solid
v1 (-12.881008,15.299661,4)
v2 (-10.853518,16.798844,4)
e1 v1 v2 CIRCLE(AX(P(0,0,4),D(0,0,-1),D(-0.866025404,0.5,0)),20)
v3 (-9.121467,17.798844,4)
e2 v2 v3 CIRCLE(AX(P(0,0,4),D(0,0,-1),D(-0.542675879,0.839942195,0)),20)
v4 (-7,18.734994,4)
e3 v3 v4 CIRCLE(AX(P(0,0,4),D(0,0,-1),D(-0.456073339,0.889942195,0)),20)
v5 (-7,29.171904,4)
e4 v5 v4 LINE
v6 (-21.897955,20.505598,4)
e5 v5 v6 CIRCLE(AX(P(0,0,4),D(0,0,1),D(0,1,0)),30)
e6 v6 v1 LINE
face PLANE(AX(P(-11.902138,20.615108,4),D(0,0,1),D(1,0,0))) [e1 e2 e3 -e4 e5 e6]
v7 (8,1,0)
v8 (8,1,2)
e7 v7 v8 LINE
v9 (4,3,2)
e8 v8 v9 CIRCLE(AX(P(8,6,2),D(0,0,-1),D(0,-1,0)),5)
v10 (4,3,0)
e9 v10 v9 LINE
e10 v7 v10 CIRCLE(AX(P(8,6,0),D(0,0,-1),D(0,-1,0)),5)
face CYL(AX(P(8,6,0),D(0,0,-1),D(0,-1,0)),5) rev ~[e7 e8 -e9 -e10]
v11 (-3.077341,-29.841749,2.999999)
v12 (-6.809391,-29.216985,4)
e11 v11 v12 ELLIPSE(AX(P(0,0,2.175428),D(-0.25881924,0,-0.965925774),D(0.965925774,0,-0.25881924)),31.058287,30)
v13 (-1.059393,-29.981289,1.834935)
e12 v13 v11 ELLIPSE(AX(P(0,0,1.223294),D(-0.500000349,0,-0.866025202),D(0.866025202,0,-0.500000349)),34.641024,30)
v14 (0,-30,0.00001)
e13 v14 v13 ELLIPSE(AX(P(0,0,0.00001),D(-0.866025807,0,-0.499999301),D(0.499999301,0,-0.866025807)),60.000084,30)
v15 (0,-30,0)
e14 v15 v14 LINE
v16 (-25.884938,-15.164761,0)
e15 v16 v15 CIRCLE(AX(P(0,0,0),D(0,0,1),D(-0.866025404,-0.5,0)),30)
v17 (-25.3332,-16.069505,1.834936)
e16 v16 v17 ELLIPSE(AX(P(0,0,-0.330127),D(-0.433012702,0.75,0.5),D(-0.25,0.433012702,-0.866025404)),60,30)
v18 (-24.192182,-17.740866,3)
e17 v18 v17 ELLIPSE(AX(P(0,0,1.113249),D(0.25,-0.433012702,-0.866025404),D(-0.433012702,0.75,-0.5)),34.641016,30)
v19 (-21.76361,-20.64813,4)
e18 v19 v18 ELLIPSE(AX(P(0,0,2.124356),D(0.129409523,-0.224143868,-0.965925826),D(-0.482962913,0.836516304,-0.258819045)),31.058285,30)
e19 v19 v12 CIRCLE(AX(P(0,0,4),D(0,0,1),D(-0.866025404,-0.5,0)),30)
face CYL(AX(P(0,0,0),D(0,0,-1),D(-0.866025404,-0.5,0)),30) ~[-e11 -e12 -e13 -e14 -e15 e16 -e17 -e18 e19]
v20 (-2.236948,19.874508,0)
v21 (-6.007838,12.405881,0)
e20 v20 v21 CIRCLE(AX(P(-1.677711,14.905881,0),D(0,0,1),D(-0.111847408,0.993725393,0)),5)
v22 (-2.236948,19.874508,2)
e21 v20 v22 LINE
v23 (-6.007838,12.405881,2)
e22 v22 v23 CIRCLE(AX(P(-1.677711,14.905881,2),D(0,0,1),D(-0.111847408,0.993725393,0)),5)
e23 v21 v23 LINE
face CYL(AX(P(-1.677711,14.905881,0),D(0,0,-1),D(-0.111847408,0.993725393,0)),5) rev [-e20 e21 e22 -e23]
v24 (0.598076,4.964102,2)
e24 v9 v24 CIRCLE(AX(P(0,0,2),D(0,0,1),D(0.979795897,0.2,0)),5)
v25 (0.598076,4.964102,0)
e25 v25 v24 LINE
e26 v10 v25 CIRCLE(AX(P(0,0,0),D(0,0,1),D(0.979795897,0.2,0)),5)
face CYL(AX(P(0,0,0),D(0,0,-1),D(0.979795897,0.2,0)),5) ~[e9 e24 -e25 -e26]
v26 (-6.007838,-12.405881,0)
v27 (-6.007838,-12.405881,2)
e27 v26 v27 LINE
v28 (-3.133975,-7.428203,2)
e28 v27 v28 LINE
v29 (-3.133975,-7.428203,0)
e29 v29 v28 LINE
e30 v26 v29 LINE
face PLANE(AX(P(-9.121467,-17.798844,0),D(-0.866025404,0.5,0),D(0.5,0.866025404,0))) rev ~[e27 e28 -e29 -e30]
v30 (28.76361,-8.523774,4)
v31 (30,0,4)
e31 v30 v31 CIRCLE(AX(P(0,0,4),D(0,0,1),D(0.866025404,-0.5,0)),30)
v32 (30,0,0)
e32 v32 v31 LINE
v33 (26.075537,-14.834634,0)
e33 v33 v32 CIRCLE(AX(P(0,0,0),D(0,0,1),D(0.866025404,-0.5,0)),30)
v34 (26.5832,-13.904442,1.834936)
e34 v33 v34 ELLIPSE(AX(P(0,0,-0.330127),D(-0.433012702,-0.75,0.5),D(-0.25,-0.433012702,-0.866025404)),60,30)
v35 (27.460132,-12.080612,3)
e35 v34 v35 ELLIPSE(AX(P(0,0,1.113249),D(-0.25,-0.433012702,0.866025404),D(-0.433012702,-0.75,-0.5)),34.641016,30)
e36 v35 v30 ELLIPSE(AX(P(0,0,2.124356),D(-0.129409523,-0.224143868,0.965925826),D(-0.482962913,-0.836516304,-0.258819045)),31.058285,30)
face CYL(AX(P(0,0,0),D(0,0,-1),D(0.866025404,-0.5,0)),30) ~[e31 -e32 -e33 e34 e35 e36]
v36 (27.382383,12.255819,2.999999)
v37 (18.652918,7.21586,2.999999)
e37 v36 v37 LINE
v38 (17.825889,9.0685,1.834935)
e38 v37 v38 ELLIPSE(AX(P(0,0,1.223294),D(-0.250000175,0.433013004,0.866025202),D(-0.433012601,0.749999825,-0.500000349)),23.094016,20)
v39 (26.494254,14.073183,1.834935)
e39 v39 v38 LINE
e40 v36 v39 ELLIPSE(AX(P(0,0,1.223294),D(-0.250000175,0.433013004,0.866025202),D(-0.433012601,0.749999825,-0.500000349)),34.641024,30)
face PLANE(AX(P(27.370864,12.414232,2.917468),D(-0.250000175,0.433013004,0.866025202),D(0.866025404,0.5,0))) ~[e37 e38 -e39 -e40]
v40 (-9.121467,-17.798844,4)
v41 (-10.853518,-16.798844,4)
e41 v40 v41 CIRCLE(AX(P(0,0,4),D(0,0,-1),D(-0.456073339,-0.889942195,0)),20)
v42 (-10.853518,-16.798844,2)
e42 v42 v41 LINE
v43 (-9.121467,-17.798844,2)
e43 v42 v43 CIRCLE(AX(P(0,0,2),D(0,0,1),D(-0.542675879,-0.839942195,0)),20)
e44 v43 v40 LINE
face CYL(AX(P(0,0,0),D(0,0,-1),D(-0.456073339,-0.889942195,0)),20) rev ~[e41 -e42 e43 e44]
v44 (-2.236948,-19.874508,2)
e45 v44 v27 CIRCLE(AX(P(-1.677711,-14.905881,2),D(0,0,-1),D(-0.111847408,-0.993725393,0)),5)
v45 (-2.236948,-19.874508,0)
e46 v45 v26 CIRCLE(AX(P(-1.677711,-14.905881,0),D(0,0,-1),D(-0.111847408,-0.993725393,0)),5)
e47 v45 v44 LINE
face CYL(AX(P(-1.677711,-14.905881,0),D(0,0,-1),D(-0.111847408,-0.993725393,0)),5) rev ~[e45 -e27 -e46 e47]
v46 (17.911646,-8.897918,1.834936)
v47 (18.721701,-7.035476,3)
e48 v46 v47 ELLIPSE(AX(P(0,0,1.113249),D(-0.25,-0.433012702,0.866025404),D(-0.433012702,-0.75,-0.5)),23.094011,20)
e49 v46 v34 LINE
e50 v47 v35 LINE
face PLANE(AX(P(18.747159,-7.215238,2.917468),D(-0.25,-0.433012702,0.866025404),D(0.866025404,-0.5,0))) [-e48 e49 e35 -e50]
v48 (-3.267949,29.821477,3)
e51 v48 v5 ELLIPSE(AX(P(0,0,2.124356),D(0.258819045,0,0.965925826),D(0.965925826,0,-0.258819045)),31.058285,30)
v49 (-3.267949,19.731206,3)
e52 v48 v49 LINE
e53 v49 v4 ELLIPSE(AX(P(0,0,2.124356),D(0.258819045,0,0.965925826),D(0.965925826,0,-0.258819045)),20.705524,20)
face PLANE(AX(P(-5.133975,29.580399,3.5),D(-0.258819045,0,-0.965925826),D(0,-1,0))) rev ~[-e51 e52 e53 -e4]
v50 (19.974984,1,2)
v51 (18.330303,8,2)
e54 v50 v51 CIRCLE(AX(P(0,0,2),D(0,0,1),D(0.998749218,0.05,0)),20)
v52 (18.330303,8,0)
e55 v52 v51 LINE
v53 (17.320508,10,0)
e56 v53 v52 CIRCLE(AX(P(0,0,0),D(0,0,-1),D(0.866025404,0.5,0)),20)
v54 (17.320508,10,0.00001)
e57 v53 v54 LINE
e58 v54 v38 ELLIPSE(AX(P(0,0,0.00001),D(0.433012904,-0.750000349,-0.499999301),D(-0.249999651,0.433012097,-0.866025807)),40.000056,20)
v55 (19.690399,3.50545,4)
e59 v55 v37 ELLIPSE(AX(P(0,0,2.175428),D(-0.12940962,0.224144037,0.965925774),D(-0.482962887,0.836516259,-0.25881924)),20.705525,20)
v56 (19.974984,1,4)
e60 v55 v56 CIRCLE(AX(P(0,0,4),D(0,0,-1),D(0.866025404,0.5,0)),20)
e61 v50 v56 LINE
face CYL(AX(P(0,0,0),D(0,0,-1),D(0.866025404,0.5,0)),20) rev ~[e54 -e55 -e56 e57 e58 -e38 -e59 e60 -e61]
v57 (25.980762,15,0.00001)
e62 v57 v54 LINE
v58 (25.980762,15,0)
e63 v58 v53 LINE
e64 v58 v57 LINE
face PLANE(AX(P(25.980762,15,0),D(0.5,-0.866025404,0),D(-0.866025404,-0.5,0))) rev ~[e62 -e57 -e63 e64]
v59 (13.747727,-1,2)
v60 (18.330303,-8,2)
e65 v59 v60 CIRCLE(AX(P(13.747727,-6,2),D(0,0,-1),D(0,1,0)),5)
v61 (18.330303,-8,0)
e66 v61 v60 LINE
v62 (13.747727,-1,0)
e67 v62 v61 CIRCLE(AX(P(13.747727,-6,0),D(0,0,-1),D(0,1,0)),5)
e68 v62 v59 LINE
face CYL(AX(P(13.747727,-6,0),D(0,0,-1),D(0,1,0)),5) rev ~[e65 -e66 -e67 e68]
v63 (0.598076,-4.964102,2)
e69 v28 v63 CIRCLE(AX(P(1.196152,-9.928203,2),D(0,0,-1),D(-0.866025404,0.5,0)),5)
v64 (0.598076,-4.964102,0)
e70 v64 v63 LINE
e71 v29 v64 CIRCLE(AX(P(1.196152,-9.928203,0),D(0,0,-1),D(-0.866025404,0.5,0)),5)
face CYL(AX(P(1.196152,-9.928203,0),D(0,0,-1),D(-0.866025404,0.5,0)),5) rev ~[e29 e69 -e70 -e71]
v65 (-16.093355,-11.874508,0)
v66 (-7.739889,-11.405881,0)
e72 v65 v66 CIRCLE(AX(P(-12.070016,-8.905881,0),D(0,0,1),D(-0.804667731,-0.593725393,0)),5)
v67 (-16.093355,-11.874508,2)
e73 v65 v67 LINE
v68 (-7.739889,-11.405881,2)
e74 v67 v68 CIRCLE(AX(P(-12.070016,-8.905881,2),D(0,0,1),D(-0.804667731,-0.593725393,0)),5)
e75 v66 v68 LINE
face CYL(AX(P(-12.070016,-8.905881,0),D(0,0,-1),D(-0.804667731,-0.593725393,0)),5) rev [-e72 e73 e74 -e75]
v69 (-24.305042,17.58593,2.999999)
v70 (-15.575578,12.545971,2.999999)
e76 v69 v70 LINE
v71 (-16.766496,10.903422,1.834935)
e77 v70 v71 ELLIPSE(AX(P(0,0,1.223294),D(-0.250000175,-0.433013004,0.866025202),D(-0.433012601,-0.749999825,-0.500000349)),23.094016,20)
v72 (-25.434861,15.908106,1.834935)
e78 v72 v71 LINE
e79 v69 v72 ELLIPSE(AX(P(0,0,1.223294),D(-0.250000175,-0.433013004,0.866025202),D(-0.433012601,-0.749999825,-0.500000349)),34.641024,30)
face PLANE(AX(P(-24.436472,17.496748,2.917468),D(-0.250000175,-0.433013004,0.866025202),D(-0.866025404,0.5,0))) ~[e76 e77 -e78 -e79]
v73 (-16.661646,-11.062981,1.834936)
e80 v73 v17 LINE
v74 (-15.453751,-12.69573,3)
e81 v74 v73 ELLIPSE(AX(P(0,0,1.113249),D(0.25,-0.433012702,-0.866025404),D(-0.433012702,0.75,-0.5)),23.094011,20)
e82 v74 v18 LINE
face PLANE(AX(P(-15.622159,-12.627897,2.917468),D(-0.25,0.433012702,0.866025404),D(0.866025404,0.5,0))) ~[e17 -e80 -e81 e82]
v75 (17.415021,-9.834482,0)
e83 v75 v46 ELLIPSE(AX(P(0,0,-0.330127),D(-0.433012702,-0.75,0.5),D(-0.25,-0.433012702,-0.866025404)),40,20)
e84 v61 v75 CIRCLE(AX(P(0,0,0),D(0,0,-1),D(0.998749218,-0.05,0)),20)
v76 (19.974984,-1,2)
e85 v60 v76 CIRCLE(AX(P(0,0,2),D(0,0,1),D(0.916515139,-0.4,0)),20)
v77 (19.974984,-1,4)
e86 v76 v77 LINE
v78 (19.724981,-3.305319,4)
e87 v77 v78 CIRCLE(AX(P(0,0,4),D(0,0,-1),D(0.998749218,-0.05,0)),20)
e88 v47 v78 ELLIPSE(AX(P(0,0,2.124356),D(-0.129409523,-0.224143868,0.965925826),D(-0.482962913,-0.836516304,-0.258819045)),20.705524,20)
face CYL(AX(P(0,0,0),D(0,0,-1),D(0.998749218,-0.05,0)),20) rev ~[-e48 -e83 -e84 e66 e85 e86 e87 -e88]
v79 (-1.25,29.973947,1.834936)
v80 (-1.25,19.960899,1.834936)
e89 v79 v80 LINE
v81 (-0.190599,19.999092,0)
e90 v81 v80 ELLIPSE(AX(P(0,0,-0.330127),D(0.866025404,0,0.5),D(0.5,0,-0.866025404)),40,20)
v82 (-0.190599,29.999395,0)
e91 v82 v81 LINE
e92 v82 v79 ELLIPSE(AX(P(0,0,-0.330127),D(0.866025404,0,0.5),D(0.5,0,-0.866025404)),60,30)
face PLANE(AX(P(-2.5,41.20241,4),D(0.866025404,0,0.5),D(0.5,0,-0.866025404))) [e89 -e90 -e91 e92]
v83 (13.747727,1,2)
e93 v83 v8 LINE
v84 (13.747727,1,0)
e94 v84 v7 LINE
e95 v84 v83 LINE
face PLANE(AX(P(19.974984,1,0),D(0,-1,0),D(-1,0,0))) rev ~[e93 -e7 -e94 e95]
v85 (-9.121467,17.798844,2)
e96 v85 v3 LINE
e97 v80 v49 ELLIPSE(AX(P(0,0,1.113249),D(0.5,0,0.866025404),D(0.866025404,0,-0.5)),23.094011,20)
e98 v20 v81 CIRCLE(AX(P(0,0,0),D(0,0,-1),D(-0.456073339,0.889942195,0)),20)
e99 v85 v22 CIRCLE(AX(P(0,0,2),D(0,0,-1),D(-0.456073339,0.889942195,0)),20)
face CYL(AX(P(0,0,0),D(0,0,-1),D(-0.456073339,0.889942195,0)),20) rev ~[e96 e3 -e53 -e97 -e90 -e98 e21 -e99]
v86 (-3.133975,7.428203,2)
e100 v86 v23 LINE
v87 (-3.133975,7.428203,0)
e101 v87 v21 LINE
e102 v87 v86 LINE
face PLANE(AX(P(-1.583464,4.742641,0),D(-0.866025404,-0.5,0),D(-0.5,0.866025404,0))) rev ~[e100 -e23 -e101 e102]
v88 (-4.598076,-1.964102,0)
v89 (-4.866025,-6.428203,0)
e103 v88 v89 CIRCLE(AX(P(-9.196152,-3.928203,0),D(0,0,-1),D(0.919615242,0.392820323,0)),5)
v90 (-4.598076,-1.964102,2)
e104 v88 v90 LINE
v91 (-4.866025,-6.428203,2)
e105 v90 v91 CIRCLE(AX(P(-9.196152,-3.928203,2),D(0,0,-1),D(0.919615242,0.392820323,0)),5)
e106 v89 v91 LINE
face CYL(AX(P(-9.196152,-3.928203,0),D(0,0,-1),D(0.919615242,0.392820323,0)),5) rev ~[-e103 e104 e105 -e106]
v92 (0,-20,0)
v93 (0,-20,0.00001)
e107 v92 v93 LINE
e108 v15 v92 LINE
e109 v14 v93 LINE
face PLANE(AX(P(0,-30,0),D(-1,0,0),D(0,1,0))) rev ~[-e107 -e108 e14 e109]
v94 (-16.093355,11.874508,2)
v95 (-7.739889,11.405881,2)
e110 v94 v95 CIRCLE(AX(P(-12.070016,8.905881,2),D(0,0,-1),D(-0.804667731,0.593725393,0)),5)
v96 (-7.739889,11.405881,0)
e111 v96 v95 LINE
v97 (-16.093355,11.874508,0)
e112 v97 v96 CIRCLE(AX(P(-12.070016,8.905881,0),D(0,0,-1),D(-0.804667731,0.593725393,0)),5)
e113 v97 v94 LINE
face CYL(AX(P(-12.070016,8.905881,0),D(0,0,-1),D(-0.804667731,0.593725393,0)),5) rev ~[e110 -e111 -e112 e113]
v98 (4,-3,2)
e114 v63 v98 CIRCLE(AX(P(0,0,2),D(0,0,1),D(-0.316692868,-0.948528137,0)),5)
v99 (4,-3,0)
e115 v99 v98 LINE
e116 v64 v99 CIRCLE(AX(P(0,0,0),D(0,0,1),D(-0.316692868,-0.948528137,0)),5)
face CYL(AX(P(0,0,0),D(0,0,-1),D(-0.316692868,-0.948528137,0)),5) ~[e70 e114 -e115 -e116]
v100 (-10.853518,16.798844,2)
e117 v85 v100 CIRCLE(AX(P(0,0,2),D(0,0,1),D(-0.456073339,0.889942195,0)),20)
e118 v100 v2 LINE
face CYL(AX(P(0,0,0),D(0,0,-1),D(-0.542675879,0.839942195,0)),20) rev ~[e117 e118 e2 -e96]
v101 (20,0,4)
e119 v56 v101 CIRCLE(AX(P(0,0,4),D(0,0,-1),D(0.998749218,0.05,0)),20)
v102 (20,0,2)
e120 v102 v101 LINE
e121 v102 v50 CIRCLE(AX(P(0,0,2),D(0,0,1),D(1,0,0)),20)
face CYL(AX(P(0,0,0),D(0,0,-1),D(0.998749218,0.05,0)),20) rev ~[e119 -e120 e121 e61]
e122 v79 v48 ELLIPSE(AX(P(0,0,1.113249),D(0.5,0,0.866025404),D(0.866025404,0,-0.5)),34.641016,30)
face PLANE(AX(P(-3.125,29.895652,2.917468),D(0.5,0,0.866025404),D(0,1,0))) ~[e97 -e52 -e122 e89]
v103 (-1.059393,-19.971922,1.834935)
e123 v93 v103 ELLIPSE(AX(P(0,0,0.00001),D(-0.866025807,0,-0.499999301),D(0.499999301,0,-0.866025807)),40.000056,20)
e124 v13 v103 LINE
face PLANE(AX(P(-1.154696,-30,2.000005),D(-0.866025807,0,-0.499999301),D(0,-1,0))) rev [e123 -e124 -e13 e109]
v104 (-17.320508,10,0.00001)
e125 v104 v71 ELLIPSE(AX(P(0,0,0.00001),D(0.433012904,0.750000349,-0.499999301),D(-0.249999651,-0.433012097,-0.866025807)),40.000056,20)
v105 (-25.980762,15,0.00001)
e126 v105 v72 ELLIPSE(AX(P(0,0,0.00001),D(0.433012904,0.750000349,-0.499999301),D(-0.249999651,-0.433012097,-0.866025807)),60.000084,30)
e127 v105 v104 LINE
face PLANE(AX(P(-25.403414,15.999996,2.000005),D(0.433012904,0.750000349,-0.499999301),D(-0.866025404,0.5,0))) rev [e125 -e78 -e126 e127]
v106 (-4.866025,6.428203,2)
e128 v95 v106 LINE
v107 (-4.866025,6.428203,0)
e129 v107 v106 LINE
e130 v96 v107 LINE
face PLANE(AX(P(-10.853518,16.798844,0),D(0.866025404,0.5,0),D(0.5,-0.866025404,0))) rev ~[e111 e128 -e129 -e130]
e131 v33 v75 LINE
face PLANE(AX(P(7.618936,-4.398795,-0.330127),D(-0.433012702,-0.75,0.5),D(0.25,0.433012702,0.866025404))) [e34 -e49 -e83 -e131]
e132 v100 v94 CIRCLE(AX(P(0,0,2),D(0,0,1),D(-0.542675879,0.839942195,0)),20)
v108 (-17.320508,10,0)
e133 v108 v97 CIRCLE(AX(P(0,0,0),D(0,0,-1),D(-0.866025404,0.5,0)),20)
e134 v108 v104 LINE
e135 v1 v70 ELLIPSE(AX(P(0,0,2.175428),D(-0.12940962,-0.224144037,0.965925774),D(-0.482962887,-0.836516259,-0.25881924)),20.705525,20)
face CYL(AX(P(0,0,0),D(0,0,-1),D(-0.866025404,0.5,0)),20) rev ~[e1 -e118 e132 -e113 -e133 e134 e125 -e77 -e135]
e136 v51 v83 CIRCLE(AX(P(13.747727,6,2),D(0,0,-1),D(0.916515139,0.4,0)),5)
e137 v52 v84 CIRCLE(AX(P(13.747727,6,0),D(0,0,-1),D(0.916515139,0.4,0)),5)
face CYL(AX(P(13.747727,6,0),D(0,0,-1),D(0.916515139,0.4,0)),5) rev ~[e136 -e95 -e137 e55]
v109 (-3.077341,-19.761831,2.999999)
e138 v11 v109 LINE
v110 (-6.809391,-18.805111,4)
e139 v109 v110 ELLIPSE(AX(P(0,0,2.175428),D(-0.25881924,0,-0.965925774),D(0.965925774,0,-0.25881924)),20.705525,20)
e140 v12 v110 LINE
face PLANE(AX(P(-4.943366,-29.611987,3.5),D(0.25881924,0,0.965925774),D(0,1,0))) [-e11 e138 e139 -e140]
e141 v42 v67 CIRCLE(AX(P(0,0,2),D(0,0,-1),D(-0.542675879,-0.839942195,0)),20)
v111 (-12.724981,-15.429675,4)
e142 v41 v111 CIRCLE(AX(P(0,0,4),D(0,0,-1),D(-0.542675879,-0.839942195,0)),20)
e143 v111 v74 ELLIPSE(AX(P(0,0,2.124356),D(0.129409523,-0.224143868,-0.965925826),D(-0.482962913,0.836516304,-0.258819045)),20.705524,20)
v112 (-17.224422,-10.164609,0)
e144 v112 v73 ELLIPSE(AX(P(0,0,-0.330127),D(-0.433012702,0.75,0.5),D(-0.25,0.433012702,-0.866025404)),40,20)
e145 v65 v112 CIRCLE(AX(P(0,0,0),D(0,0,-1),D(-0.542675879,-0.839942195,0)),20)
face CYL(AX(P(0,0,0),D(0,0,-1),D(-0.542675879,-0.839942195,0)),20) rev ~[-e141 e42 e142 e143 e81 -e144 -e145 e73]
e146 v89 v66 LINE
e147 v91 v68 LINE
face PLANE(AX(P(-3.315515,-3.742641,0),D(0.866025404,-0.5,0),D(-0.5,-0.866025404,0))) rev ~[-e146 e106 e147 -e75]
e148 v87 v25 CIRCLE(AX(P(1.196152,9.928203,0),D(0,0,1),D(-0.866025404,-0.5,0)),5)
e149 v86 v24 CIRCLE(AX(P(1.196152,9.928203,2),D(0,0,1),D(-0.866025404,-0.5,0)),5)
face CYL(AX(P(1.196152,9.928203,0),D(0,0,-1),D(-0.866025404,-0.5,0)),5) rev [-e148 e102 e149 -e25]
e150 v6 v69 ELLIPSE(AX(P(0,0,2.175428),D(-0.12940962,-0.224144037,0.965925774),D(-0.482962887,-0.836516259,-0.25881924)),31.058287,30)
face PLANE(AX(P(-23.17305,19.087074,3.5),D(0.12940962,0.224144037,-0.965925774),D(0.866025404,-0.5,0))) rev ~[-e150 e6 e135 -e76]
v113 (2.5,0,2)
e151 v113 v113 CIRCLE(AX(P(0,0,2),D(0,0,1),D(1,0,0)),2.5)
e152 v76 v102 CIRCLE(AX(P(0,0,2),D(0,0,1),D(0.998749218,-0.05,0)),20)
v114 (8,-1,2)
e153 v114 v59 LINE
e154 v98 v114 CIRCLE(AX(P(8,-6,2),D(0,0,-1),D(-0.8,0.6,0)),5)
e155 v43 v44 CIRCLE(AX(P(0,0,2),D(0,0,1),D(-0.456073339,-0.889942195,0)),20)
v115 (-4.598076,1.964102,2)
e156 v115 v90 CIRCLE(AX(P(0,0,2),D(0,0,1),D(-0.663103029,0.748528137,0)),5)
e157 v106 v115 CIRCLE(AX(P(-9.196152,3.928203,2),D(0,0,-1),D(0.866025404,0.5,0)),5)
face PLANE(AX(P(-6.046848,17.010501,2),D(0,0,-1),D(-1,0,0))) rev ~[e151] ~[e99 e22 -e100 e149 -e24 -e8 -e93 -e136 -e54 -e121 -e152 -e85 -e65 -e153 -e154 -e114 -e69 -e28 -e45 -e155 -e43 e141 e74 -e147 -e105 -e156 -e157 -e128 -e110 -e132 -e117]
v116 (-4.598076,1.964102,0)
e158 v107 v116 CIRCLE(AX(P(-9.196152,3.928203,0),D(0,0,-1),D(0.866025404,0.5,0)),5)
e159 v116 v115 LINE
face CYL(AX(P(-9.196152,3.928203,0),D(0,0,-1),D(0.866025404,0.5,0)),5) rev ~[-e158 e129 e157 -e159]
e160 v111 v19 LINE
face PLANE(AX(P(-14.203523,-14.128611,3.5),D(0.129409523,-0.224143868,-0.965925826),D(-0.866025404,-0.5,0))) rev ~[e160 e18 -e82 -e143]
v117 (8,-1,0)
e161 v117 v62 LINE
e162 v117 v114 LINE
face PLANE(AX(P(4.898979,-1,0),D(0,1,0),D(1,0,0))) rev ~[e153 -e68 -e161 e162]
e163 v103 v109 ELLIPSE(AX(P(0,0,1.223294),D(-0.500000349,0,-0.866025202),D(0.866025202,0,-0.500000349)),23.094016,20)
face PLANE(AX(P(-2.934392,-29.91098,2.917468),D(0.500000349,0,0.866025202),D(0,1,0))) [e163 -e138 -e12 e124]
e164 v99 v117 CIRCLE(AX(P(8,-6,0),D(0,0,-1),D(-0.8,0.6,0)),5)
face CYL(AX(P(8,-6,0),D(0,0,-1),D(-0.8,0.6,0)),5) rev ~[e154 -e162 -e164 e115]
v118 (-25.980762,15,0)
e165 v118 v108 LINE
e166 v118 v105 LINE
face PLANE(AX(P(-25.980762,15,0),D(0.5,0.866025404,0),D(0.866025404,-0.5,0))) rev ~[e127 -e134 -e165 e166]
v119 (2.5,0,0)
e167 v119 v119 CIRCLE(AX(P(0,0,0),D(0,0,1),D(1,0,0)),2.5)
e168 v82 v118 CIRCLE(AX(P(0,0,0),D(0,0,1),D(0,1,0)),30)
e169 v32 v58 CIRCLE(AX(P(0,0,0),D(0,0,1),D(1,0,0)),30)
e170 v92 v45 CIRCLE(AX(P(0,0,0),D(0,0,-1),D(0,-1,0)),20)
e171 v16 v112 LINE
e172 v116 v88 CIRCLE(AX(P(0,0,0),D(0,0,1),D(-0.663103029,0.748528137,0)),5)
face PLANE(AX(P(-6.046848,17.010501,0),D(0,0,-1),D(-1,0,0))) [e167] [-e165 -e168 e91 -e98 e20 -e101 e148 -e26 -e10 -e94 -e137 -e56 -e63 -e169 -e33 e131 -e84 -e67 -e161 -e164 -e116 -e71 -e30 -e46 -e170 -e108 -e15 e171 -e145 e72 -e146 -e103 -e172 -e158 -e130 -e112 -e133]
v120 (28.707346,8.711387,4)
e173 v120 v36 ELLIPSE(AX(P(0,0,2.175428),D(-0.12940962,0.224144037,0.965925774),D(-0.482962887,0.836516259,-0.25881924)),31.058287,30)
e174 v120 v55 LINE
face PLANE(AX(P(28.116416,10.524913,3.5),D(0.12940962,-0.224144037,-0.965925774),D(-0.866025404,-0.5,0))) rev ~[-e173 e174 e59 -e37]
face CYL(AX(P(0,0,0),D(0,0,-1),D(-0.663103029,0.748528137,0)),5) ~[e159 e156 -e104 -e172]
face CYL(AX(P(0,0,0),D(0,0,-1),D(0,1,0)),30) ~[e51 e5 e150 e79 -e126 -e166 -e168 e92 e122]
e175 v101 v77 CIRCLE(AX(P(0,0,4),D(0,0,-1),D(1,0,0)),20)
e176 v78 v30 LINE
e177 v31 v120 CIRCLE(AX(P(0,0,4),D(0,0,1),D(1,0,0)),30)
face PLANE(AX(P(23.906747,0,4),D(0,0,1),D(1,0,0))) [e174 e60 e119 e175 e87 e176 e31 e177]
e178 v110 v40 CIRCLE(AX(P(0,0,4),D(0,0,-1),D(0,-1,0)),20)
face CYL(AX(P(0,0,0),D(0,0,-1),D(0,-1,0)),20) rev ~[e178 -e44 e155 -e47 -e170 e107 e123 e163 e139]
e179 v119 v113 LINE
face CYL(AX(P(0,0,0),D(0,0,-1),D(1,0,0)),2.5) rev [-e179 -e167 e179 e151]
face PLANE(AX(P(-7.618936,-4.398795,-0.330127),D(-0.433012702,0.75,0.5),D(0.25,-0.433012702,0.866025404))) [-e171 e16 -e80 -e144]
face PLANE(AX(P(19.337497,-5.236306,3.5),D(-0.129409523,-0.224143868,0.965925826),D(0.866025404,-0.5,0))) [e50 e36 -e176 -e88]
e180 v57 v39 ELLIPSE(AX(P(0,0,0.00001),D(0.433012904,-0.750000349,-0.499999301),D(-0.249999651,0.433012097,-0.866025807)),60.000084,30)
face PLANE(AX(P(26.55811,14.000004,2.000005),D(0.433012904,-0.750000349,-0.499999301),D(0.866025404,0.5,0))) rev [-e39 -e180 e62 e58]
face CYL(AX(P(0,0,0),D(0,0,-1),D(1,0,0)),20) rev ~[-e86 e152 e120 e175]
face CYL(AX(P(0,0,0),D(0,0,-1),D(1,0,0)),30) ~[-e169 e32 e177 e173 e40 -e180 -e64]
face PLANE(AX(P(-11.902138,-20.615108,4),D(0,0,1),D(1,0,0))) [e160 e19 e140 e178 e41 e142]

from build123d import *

# Parameters (mm, degrees)
F0_R        = 2.5
F1_DEPTH    = 2
F2_DEPTH    = 4
F3_T1_DEPTH = 2
F4_T1_DEPTH = 32.4048198529
F4_T3_DEPTH = 32.4048198529
F4_T5_DEPTH = 32.4048198529
F5_SIZE2    = 2.309391
F5_SIZE     = 3.99999
F5_2_SIZE2  = 2.309391
F5_2_SIZE   = 3.99999
F5_3_SIZE2  = 2.309391
F5_3_SIZE   = 3.99999
F6_SIZE     = 2.5
F7_SIZE     = 2


# Not quite as in the source:
# - a fillet or chamfer that OpenCascade refuses, or shapes differently, is made with other operations: its cross-section is extruded or revolved along the edge and cut away or added
# - a fillet or chamfer is up to 0.001 mm smaller than in the source, because OpenCascade refuses the exact size


with BuildPart() as f1:
    # F0 (on Top) → F1 (new body)
    with BuildSketch(Plane.XY):
        with BuildLine():
            ThreePointArc((-10.8535175815, -16.798843892), (-10, -17.3205080757), (-9.1214667739, -17.798843892))
            Line((-9.1214667739, -17.798843892), (-1.583464339, -4.7426406871))
            ThreePointArc((-1.583464339, -4.7426406871), (-2.5, -4.3301270189), (-3.3155151466, -3.7426406871))
            Line((-3.3155151466, -3.7426406871), (-10.8535175815, -16.798843892))
        make_face()
        with BuildLine():
            Line((-1.583464339, 4.7426406871), (-9.1214667739, 17.798843892))
            ThreePointArc((-9.1214667739, 17.798843892), (-10, 17.3205080757), (-10.8535175815, 16.798843892))
            Line((-10.8535175815, 16.798843892), (-3.3155151466, 3.7426406871))
            ThreePointArc((-3.3155151466, 3.7426406871), (-2.5, 4.3301270189), (-1.583464339, 4.7426406871))
        make_face()
        with BuildLine():
            ThreePointArc((20, 0), (19.9937451108, 0.5001564212), (19.9749843554, 1))
            Line((19.9749843554, 1), (4.8989794856, 1))
            ThreePointArc((4.8989794856, 1), (4.974680765, 0.50254481), (5, 0))
            ThreePointArc((5, 0), (4.974680765, -0.50254481), (4.8989794856, -1))
            Line((4.8989794856, -1), (19.9749843554, -1))
            ThreePointArc((19.9749843554, -1), (19.9937451108, -0.5001564212), (20, 0))
        make_face()
        with BuildLine():
            ThreePointArc((5, 0), (4.974680765, 0.50254481), (4.8989794856, 1))
            ThreePointArc((4.8989794856, 1), (2.5, 4.3301270189), (-1.583464339, 4.7426406871))
            ThreePointArc((-1.583464339, 4.7426406871), (-2.5, 4.3301270189), (-3.3155151466, 3.7426406871))
            ThreePointArc((-3.3155151466, 3.7426406871), (-5, 0), (-3.3155151466, -3.7426406871))
            ThreePointArc((-3.3155151466, -3.7426406871), (-2.5, -4.3301270189), (-1.583464339, -4.7426406871))
            ThreePointArc((-1.583464339, -4.7426406871), (2.5, -4.3301270189), (4.8989794856, -1))
            ThreePointArc((4.8989794856, -1), (4.974680765, -0.50254481), (5, 0))
        make_face()
        Circle(F0_R, mode=Mode.SUBTRACT)
    extrude(amount=F1_DEPTH)

    # F0 (on Top) → F2 (join)
    with BuildSketch(Plane.XY):
        with BuildLine():
            Line((0, 20), (0, 30))
            ThreePointArc((0, 30), (-15, 25.9807621135), (-25.9807621135, 15))
            Line((-25.9807621135, 15), (-17.3205080757, 10))
            ThreePointArc((-17.3205080757, 10), (-14.4913767462, 13.7840487521), (-10.8535175815, 16.798843892))
            ThreePointArc((-10.8535175815, 16.798843892), (-10, 17.3205080757), (-9.1214667739, 17.798843892))
            ThreePointArc((-9.1214667739, 17.798843892), (-4.6916480132, 19.4419247741), (0, 20))
        make_face()
        with BuildLine():
            ThreePointArc((25.9807621135, -15), (28.9777747887, -7.7645713531), (30, 0))
            ThreePointArc((30, 0), (28.9777747887, 7.7645713531), (25.9807621135, 15))
            Line((25.9807621135, 15), (17.3205080757, 10))
            ThreePointArc((17.3205080757, 10), (19.1830247594, 5.657876022), (19.9749843554, 1))
            ThreePointArc((19.9749843554, 1), (19.9937451108, 0.5001564212), (20, 0))
            ThreePointArc((20, 0), (19.9937451108, -0.5001564212), (19.9749843554, -1))
            ThreePointArc((19.9749843554, -1), (19.1830247594, -5.657876022), (17.3205080757, -10))
            Line((17.3205080757, -10), (25.9807621135, -15))
        make_face()
        with BuildLine():
            ThreePointArc((-25.9807621135, -15), (-15, -25.9807621135), (0, -30))
            Line((0, -30), (0, -20))
            ThreePointArc((0, -20), (-4.6916480132, -19.4419247741), (-9.1214667739, -17.798843892))
            ThreePointArc((-9.1214667739, -17.798843892), (-10, -17.3205080757), (-10.8535175815, -16.798843892))
            ThreePointArc((-10.8535175815, -16.798843892), (-14.4913767462, -13.7840487521), (-17.3205080757, -10))
            Line((-17.3205080757, -10), (-25.9807621135, -15))
        make_face()
    extrude(amount=F2_DEPTH)

    # F3: fillet of radius 5 on 12 edges, made by hand

    # F3_s2 → F3_t1 (join)
    with BuildSketch(Plane.XY):
        with BuildLine():
            ThreePointArc((-2.2369481596, 19.8745078664), (-6.1410694312, 17.1594186926), (-6.0078381387, 12.4058808998))
            Line((-6.0078381387, 12.4058808998), (-9.1214667739, 17.798843892))
            ThreePointArc((-9.1214667739, 17.798843892), (-5.7732566792, 19.148616329), (-2.2369481596, 19.8745078664))
        make_face()
        with BuildLine():
            ThreePointArc((-16.0933546202, 11.8745078664), (-11.7899577863, 13.8980314801), (-7.7398889462, 11.4058808998))
            Line((-7.7398889462, 11.4058808998), (-10.8535175815, 16.798843892))
            ThreePointArc((-10.8535175815, 16.798843892), (-13.6965598486, 14.5740951113), (-16.0933546202, 11.8745078664))
        make_face()
        with BuildLine():
            ThreePointArc((18.3303027798, 8), (17.9310272175, 3.2613872125), (13.7477270849, 1))
            Line((13.7477270849, 1), (19.9749843554, 1))
            ThreePointArc((19.9749843554, 1), (19.4698165279, 4.5745212177), (18.3303027798, 8))
        make_face()
        with BuildLine():
            ThreePointArc((13.7477270849, -1), (17.9310272175, -3.2613872125), (18.3303027798, -8))
            ThreePointArc((18.3303027798, -8), (19.4698165279, -4.5745212177), (19.9749843554, -1))
            Line((19.9749843554, -1), (13.7477270849, -1))
        make_face()
        with BuildLine():
            ThreePointArc((-16.0933546202, -11.8745078664), (-11.7899577863, -13.8980314801), (-7.7398889462, -11.4058808998))
            Line((-7.7398889462, -11.4058808998), (-10.8535175815, -16.798843892))
            ThreePointArc((-10.8535175815, -16.798843892), (-13.6965598486, -14.5740951113), (-16.0933546202, -11.8745078664))
        make_face()
        with BuildLine():
            ThreePointArc((-2.2369481596, -19.8745078664), (-6.1410694312, -17.1594186926), (-6.0078381387, -12.4058808998))
            Line((-6.0078381387, -12.4058808998), (-9.1214667739, -17.798843892))
            ThreePointArc((-9.1214667739, -17.798843892), (-5.7732566792, -19.148616329), (-2.2369481596, -19.8745078664))
        make_face()
        with BuildLine():
            ThreePointArc((-3.1339745962, 7.4282032303), (-1.5587969348, 5.7556435797), (0.5980762114, 4.9641016151))
            ThreePointArc((0.5980762114, 4.9641016151), (-0.5049838375, 4.9744337692), (-1.583464339, 4.7426406871))
            Line((-1.583464339, 4.7426406871), (-3.1339745962, 7.4282032303))
        make_face()
        with BuildLine():
            ThreePointArc((8, 1), (5.7639320225, 1.527864045), (4, 3))
            ThreePointArc((4, 3), (4.5604779323, 2.0498880528), (4.8989794856, 1))
            Line((4.8989794856, 1), (8, 1))
        make_face()
        with BuildLine():
            ThreePointArc((-4.8660254038, 6.4282032303), (-4.2051350877, 4.2277795347), (-4.5980762114, 1.9641016151))
            ThreePointArc((-4.5980762114, 1.9641016151), (-4.0554940948, 2.9245457164), (-3.3155151466, 3.7426406871))
            Line((-3.3155151466, 3.7426406871), (-4.8660254038, 6.4282032303))
        make_face()
        with BuildLine():
            ThreePointArc((-4.5980762114, -1.9641016151), (-4.2051350877, -4.2277795347), (-4.8660254038, -6.4282032303))
            Line((-4.8660254038, -6.4282032303), (-3.3155151466, -3.7426406871))
            ThreePointArc((-3.3155151466, -3.7426406871), (-4.0554940948, -2.9245457164), (-4.5980762114, -1.9641016151))
        make_face()
        with BuildLine():
            ThreePointArc((-3.1339745962, -7.4282032303), (-1.5587969348, -5.7556435797), (0.5980762114, -4.9641016151))
            ThreePointArc((0.5980762114, -4.9641016151), (-0.5049838375, -4.9744337692), (-1.583464339, -4.7426406871))
            Line((-1.583464339, -4.7426406871), (-3.1339745962, -7.4282032303))
        make_face()
        with BuildLine():
            ThreePointArc((4, -3), (5.7639320225, -1.527864045), (8, -1))
            Line((8, -1), (4.8989794856, -1))
            ThreePointArc((4.8989794856, -1), (4.5604779323, -2.0498880528), (4, -3))
        make_face()
    extrude(amount=F3_T1_DEPTH)

    # F4: chamfer of 2.5 x 4.3301270189 on 3 edges, made by hand

    # F4_s2 → F4_t1 (cut)
    with BuildSketch(Plane(origin=(-7.6189364958, -4.3987950368, 0), x_dir=(0, 0, 1), z_dir=(-0.8660254038, -0.5, 0))):
        Polygon((-0.3301270189, 0), (4, -2.5), (4, 0), align=None)
    extrude(amount=F4_T1_DEPTH, mode=Mode.SUBTRACT)

    # F4_s4 → F4_t3 (cut)
    with BuildSketch(Plane.XZ.offset(-41.2024099265)):
        Polygon((-2.5, 4), (0, -0.3301270189), (0, 4), align=None)
    extrude(amount=F4_T3_DEPTH, mode=Mode.SUBTRACT)

    # F4_s6 → F4_t5 (cut)
    with BuildSketch(Plane(origin=(7.6189364958, -4.3987950368, 0), x_dir=(0, 0, 1), z_dir=(0.8660254038, -0.5, 0))):
        Polygon((-0.3301270189, 0), (4, -2.5), (4, 0), align=None)
    extrude(amount=F4_T5_DEPTH, mode=Mode.SUBTRACT)

    # F5 (size 4 and 2.3094010768 in the source; OpenCascade refuses exactly that, so slightly less here)
    f5_edges = [f1.edges().sort_by_distance(p)[0] for p in [
        (21.650635, 12.5, 4),
    ]]
    f5_side = f1.faces().sort_by_distance((21.650635, 12.5, 2))[0]
    chamfer(f5_edges, length=F5_SIZE, length2=F5_SIZE2, reference=f5_side)

    # F5#2 (size 4 and 2.3094010768 in the source; OpenCascade refuses exactly that, so slightly less here)
    f5_2_edges = [f1.edges().sort_by_distance(p)[0] for p in [
        (-21.650635, 12.5, 4),
    ]]
    f5_2_side = f1.faces().sort_by_distance((-21.650635, 12.5, 2))[0]
    chamfer(f5_2_edges, length=F5_2_SIZE, length2=F5_2_SIZE2, reference=f5_2_side)

    # F5#3 (size 4 and 2.3094010768 in the source; OpenCascade refuses exactly that, so slightly less here)
    f5_3_edges = [f1.edges().sort_by_distance(p)[0] for p in [
        (0, -25, 4),
    ]]
    f5_3_side = f1.faces().sort_by_distance((0, -25, 2))[0]
    chamfer(f5_3_edges, length=F5_3_SIZE, length2=F5_3_SIZE2, reference=f5_3_side)

    # F6
    f6_edges = [f1.edges().sort_by_distance(p)[0] for p in [
        (-20.399464, 14.444291, 4),
        (-2.5, 24.869393, 4),
        (22.708855, 10.444309, 4),
        (22.787526, -10.269633, 4),
        (-2.309391, -24.8886, 4),
        (-20.287526, -14.59976, 4),
    ]]
    chamfer(f6_edges, length=F6_SIZE)

    # F7
    f7_edges = [f1.edges().sort_by_distance(p)[0] for p in [
        (-5, 24.472658, 4),
        (-18.823804, 16.421335, 4),
        (23.633195, 8.091225, 4),
        (23.693943, -7.906202, 4),
        (-4.809391, -24.51256, 4),
        (-18.693943, -16.566456, 4),
    ]]
    chamfer(f7_edges, length=F7_SIZE)


solid = f1.part
